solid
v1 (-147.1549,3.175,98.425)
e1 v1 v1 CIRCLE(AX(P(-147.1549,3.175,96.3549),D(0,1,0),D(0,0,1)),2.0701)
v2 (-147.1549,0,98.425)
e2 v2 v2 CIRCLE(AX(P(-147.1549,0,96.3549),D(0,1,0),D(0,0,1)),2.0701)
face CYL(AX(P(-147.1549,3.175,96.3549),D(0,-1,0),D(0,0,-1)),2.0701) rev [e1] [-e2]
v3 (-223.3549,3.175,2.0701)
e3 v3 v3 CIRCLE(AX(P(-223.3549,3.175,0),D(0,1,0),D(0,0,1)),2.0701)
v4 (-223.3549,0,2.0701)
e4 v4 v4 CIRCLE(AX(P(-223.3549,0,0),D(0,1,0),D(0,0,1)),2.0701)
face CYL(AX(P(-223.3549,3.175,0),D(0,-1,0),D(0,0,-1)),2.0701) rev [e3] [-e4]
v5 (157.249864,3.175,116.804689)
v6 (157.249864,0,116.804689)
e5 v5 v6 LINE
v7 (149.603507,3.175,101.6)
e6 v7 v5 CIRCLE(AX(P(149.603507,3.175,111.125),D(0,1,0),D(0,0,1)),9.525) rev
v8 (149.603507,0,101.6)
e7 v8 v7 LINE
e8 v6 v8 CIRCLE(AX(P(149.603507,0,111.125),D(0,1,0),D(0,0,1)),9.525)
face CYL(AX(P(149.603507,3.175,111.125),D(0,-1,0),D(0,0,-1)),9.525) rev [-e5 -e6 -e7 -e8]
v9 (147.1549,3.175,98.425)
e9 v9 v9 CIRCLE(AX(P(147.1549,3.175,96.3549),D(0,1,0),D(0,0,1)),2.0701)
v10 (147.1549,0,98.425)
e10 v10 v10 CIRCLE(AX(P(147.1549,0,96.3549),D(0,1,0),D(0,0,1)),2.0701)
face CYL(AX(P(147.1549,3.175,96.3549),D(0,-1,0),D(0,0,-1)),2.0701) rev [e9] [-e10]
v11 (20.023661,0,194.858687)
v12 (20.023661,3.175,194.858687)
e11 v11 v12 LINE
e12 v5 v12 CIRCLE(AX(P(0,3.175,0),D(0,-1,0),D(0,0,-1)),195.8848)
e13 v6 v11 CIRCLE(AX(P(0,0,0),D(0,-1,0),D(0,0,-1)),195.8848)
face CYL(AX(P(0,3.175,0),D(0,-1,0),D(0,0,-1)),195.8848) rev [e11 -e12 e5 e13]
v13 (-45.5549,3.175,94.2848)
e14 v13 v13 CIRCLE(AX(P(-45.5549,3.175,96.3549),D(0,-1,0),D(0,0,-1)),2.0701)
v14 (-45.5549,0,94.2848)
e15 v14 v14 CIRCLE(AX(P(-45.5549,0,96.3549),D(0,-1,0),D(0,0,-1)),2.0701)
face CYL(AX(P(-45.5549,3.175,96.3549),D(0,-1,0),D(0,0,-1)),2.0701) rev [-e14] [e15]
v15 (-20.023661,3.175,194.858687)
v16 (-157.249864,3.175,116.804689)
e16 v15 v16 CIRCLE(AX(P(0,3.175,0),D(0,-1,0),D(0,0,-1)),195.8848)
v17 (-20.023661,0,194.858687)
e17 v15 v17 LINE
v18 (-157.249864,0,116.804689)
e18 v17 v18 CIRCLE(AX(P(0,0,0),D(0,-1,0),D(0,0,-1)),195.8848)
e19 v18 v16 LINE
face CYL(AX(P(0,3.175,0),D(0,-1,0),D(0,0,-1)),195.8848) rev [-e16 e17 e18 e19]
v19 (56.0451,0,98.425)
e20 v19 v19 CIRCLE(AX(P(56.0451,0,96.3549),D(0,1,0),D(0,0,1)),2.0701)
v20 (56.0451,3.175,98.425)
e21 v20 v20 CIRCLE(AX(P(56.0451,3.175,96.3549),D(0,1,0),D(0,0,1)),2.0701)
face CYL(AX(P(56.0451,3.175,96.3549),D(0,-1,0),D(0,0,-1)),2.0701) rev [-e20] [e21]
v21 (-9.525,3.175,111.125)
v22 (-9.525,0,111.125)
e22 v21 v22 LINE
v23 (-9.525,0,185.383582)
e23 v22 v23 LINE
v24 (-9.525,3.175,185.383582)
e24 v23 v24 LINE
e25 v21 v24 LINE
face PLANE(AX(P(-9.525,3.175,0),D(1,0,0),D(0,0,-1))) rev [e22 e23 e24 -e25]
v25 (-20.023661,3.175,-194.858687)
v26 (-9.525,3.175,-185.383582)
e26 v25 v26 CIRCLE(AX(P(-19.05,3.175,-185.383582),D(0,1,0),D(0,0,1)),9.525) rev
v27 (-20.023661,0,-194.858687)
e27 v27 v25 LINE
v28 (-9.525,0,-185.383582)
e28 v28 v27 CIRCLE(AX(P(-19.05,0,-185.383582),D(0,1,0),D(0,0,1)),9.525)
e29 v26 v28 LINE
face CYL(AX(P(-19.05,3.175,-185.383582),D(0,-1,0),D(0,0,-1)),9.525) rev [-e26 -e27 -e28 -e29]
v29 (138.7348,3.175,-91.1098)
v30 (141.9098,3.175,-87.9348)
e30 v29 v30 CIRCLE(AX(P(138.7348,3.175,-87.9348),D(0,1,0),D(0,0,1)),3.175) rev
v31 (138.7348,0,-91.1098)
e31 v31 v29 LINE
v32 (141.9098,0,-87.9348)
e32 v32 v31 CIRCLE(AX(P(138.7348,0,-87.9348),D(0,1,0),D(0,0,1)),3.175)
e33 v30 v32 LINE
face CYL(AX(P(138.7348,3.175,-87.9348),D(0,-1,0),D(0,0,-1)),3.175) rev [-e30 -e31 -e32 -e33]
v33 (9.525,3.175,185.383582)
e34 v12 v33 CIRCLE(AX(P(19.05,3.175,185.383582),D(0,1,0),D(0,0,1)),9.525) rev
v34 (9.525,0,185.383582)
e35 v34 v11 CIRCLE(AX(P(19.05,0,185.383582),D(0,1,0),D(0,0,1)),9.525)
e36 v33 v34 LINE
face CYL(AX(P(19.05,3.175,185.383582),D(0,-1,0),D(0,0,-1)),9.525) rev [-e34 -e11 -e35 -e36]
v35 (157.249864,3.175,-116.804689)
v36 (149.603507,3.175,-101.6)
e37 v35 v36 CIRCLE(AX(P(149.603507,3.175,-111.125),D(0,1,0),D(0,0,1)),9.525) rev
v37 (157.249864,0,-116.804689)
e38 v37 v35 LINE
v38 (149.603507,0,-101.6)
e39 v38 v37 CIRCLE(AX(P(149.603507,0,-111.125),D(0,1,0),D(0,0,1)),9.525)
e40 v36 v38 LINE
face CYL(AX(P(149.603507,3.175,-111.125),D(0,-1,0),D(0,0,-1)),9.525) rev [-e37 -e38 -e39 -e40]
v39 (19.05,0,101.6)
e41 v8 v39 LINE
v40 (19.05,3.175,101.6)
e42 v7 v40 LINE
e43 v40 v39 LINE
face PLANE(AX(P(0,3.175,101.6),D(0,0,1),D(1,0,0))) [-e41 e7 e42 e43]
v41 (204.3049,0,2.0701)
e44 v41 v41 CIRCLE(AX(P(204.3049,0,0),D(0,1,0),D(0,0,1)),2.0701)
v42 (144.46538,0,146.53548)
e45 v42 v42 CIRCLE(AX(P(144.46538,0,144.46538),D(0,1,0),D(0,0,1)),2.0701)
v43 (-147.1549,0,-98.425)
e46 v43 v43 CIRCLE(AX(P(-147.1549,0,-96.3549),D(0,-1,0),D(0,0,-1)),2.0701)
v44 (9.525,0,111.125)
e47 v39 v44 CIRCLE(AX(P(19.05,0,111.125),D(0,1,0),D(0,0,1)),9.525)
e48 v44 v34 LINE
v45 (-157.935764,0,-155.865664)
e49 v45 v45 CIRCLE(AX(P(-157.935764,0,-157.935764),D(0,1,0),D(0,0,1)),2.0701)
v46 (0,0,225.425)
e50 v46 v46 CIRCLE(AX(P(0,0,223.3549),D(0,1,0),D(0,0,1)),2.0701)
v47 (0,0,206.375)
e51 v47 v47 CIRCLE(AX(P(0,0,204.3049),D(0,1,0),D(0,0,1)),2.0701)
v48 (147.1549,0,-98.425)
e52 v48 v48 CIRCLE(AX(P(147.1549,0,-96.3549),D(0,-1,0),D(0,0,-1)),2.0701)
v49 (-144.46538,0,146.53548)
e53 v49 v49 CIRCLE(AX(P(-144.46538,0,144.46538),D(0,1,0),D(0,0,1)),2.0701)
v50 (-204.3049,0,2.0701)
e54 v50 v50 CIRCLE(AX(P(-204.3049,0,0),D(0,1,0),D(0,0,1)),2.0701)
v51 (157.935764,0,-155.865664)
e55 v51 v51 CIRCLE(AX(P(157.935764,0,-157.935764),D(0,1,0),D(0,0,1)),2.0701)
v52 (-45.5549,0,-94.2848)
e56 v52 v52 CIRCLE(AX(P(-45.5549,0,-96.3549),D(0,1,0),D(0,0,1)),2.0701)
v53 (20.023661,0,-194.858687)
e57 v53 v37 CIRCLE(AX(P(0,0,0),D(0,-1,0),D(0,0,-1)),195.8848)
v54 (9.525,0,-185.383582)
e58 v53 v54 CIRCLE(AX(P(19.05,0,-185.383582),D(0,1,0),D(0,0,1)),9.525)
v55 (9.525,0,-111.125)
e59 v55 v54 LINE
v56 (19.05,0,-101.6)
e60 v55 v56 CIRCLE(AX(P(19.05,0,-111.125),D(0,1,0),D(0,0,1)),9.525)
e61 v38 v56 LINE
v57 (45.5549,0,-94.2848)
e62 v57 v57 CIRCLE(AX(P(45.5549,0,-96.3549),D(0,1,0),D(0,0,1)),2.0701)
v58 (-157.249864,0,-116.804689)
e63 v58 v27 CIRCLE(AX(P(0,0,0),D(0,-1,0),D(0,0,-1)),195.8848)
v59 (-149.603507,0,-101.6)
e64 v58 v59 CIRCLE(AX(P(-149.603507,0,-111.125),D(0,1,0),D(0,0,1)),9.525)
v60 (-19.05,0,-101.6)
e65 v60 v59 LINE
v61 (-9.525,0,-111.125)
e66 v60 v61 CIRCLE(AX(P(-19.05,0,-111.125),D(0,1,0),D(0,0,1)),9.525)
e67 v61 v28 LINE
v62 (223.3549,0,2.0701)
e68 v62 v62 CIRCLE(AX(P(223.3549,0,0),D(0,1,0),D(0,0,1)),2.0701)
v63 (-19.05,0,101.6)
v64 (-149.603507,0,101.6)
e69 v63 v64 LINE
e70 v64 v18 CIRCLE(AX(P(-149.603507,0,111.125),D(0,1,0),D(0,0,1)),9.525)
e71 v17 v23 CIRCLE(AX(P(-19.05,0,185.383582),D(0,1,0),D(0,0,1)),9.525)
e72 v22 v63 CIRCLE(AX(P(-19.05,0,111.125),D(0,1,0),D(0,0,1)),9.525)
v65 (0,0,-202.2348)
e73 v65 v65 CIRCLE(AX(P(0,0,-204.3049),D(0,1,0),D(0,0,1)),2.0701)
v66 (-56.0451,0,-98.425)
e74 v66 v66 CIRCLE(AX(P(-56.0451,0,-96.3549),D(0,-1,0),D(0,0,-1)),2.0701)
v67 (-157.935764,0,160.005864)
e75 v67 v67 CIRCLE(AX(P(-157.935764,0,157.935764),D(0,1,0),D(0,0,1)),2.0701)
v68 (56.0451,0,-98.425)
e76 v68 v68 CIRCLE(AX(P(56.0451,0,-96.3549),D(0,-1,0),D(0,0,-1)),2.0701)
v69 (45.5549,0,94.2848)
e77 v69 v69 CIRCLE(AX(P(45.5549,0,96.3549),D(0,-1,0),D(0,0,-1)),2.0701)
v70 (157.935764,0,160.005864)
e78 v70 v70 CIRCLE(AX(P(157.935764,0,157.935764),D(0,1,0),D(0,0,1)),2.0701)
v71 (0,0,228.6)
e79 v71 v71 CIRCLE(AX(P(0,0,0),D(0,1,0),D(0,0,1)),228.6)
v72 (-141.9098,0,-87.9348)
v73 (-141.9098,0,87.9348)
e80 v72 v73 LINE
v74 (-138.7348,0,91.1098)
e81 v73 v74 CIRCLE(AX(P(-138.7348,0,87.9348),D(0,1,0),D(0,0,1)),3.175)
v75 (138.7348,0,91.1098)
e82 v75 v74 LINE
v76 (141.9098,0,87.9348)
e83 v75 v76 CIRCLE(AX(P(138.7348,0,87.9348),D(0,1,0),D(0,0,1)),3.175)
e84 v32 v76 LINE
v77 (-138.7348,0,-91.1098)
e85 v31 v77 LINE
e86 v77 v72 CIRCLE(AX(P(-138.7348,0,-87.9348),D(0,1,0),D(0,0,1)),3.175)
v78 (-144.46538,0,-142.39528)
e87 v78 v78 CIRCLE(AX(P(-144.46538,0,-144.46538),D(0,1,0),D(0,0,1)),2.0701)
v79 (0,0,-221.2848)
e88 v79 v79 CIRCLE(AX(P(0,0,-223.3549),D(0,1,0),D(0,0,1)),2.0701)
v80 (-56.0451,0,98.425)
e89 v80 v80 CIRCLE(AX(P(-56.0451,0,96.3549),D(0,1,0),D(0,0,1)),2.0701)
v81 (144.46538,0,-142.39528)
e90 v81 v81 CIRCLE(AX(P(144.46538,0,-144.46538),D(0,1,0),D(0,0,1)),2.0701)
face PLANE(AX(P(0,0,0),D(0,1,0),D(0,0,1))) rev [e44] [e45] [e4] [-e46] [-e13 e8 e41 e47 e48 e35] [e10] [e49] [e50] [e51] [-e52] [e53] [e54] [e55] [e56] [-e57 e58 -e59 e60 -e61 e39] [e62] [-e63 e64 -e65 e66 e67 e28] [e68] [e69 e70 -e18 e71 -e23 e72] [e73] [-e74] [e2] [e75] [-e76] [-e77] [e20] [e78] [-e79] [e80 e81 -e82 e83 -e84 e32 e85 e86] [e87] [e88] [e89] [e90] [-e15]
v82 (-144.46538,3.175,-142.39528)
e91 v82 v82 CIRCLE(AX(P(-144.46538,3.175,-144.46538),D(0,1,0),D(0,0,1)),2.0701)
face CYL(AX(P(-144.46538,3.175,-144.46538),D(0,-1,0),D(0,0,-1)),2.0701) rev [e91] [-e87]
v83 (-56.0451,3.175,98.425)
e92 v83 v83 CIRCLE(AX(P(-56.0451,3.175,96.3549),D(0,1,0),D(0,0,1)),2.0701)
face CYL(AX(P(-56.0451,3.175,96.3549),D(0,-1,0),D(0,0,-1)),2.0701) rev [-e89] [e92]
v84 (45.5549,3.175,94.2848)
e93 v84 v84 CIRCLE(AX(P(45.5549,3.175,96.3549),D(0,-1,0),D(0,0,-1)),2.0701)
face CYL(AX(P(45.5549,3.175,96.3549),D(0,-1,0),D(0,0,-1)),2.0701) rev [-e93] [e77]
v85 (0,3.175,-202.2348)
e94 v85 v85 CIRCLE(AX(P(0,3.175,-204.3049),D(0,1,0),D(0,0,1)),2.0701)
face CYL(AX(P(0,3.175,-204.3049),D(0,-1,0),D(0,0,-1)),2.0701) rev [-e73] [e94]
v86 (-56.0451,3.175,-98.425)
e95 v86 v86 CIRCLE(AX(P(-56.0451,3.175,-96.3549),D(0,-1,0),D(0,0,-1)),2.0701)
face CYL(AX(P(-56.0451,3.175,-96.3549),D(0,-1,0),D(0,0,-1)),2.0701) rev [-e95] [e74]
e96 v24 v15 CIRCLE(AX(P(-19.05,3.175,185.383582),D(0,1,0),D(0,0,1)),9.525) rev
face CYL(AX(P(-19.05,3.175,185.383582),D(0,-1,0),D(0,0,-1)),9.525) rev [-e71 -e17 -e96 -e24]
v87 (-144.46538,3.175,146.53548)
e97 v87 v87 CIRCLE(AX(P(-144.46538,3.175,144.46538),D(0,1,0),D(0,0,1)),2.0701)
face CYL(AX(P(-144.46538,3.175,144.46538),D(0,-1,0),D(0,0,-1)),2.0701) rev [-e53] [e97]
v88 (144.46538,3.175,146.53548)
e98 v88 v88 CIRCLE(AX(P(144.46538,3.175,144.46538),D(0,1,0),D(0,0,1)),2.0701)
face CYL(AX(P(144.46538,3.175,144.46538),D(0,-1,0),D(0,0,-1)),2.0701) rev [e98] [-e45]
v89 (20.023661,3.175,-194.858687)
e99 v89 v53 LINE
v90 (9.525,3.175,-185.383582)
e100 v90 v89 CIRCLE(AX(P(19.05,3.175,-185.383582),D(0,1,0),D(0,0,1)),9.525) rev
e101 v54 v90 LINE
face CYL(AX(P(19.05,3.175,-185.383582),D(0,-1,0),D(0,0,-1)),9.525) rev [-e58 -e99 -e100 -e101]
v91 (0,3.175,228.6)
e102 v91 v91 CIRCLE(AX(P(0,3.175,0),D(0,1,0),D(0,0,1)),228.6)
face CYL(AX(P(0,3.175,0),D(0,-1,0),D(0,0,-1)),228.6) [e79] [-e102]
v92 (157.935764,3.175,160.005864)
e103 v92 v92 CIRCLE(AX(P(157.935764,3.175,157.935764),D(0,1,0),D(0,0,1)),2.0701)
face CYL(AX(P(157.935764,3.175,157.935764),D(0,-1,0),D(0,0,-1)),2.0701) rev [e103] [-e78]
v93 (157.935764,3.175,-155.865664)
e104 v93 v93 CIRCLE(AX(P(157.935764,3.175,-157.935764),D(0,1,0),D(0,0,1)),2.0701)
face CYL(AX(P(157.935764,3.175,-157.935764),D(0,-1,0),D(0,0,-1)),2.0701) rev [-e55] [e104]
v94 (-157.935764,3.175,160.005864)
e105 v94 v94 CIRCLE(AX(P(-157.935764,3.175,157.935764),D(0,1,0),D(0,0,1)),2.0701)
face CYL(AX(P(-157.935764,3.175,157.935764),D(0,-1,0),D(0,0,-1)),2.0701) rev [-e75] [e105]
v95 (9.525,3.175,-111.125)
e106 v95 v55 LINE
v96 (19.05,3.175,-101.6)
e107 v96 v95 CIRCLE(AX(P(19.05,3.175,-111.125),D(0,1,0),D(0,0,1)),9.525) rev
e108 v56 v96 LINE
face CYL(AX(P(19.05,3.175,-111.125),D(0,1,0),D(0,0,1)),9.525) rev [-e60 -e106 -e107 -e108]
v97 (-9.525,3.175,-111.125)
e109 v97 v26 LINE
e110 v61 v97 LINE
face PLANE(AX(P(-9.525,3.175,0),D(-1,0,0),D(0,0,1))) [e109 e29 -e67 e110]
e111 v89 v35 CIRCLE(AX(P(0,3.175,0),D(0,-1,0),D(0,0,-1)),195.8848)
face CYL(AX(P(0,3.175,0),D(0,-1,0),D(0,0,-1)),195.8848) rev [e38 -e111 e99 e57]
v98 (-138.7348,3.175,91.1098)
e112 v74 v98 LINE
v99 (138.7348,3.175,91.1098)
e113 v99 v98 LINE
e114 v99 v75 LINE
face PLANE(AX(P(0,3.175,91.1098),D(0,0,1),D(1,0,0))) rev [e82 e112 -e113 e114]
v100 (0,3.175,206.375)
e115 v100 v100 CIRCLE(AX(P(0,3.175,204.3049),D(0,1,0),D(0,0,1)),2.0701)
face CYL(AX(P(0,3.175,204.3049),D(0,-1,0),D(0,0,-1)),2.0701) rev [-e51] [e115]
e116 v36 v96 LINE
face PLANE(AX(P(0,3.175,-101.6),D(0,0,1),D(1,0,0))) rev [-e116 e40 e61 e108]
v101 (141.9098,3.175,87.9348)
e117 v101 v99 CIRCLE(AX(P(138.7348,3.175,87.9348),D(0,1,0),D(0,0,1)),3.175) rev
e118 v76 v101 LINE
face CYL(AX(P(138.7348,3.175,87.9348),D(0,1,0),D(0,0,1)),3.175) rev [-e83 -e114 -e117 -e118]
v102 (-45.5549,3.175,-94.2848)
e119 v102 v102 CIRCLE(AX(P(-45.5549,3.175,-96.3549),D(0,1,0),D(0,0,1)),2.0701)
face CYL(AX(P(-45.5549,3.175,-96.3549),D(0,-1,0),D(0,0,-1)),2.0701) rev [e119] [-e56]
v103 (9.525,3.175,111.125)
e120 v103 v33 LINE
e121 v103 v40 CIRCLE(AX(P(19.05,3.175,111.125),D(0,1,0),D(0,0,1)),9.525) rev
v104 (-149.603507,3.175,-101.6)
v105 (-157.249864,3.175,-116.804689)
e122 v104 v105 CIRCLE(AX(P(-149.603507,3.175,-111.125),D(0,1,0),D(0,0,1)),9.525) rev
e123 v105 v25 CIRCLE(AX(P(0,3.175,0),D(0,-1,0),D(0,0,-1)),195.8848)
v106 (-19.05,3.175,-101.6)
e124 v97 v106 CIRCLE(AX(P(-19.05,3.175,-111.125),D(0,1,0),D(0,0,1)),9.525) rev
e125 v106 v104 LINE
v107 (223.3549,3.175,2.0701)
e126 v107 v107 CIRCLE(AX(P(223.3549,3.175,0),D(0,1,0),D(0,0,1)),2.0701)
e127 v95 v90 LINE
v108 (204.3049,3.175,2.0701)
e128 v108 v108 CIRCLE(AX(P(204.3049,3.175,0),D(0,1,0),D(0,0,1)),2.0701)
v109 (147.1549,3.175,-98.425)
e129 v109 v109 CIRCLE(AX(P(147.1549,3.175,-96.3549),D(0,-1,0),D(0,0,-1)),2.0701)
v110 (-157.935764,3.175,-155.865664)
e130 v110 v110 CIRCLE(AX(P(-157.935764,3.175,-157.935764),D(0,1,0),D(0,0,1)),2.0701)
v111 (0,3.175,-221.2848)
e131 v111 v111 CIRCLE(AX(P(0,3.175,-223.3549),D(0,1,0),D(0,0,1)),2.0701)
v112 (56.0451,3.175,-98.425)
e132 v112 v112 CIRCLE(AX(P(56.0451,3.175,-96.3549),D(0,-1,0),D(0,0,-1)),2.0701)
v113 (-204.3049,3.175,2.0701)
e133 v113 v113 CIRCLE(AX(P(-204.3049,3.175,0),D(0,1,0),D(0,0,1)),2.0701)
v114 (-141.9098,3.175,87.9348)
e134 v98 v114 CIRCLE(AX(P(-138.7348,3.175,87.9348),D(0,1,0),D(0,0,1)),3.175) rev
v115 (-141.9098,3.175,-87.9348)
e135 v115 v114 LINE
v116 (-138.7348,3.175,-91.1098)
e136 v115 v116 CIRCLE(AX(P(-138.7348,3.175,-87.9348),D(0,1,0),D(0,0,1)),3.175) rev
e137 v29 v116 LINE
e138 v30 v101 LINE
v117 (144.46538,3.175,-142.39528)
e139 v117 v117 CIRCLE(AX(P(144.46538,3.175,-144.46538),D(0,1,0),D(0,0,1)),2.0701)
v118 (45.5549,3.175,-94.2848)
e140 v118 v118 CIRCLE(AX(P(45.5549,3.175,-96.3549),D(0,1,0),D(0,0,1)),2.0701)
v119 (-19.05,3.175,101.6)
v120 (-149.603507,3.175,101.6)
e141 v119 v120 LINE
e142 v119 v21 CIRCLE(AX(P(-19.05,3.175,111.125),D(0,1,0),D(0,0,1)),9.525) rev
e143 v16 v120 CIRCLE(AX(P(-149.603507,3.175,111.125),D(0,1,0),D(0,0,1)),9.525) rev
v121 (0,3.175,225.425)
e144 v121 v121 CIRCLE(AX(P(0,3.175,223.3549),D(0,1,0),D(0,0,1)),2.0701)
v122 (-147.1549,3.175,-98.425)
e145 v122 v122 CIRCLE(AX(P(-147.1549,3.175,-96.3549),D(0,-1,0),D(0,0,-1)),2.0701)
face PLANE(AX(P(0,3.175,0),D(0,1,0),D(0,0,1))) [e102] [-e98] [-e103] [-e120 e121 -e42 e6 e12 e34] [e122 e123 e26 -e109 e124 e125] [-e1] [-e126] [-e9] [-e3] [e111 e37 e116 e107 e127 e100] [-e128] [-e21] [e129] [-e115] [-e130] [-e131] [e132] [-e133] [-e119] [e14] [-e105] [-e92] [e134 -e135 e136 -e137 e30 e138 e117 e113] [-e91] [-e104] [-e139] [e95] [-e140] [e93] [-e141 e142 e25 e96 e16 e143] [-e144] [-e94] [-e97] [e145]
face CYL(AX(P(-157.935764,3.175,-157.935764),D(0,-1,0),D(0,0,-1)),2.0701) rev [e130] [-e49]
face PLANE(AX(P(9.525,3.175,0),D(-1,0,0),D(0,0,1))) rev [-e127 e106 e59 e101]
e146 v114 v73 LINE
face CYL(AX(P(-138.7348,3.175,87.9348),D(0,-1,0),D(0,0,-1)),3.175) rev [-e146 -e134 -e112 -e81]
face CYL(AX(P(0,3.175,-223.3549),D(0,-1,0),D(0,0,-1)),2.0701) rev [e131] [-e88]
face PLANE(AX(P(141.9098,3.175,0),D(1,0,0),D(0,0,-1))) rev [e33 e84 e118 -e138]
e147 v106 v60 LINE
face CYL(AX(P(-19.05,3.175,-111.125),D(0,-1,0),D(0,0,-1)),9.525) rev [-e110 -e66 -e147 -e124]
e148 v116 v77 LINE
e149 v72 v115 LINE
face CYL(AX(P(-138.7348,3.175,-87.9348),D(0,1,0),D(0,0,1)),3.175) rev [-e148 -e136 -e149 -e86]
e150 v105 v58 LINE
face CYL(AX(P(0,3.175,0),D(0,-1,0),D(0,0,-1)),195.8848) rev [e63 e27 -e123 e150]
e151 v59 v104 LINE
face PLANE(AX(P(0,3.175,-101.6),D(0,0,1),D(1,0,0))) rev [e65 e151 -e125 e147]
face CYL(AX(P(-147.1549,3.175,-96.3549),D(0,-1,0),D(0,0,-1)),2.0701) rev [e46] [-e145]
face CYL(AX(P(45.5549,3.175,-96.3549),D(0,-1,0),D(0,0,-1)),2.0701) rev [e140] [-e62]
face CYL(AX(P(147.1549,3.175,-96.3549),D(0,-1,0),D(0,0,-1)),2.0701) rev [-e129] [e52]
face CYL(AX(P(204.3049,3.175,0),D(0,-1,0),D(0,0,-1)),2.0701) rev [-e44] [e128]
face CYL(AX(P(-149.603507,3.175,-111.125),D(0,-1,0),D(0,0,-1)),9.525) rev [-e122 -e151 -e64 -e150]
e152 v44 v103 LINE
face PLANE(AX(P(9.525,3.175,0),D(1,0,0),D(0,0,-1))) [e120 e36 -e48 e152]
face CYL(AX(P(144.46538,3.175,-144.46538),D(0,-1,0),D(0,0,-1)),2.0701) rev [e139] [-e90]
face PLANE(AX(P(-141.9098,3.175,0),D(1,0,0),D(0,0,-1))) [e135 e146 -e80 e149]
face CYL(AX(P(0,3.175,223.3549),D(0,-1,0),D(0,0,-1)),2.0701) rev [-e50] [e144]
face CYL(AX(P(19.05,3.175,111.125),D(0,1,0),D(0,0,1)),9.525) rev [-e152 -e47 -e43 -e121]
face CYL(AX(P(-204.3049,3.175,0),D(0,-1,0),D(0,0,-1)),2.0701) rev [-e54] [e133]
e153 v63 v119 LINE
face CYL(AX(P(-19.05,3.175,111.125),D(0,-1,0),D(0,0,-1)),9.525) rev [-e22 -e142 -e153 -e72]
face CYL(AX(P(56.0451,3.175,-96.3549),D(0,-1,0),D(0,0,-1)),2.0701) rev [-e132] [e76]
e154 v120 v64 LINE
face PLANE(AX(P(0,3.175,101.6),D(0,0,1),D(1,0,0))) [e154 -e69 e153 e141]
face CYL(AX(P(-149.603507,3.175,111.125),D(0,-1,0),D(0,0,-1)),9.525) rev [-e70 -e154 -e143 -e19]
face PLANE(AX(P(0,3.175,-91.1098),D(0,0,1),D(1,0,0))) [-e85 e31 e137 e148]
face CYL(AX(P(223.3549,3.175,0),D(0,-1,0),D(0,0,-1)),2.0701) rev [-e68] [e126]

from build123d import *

# Parameters (mm, degrees)
BOSS_EXTRUDE1_OUTLINE_R   = 228.6
BOSS_EXTRUDE1_OUTLINE_R_2 = 2.0701
BOSS_EXTRUDE1_DEPTH       = 3.175
SKETCH3_W                 = 283.8196
SKETCH3_H                 = 182.2196
SKETCH3_R                 = 2.0701
CUT_EXTRUDE1_DEPTH        = 324.304810705
FILLET1_R                 = 3.175
CUT_EXTRUDE2_DEPTH        = 324.304810705
FILLET2_R                 = 9.525


# Read off the part's stored shape, not the designer's step: Boss-Extrude1
with BuildPart() as part:
    # Boss-Extrude1 outline → Boss-Extrude1 (new body)
    with BuildSketch(Plane(origin=(0, 0, 0), x_dir=(1, 0, 0), z_dir=(0, 1, 0))):
        Circle(BOSS_EXTRUDE1_OUTLINE_R)
        with Locations((-157.935764401, -157.935764401)):
            Circle(BOSS_EXTRUDE1_OUTLINE_R_2, mode=Mode.SUBTRACT)
        with Locations((-144.46538022, -144.46538022)):
            Circle(BOSS_EXTRUDE1_OUTLINE_R_2, mode=Mode.SUBTRACT)
        with Locations((0, -223.3549)):
            Circle(BOSS_EXTRUDE1_OUTLINE_R_2, mode=Mode.SUBTRACT)
        with Locations((0, -204.3049)):
            Circle(BOSS_EXTRUDE1_OUTLINE_R_2, mode=Mode.SUBTRACT)
        with Locations((157.935764401, -157.935764401)):
            Circle(BOSS_EXTRUDE1_OUTLINE_R_2, mode=Mode.SUBTRACT)
        with Locations((144.46538022, -144.46538022)):
            Circle(BOSS_EXTRUDE1_OUTLINE_R_2, mode=Mode.SUBTRACT)
        with Locations((-223.3549, 0)):
            Circle(BOSS_EXTRUDE1_OUTLINE_R_2, mode=Mode.SUBTRACT)
        with Locations((-204.3049, 0)):
            Circle(BOSS_EXTRUDE1_OUTLINE_R_2, mode=Mode.SUBTRACT)
        with Locations((-144.46538022, 144.46538022)):
            Circle(BOSS_EXTRUDE1_OUTLINE_R_2, mode=Mode.SUBTRACT)
        with Locations((-157.935764401, 157.935764401)):
            Circle(BOSS_EXTRUDE1_OUTLINE_R_2, mode=Mode.SUBTRACT)
        with Locations((204.3049, 0)):
            Circle(BOSS_EXTRUDE1_OUTLINE_R_2, mode=Mode.SUBTRACT)
        with Locations((223.3549, 0)):
            Circle(BOSS_EXTRUDE1_OUTLINE_R_2, mode=Mode.SUBTRACT)
        with Locations((0, 204.3049)):
            Circle(BOSS_EXTRUDE1_OUTLINE_R_2, mode=Mode.SUBTRACT)
        with Locations((0, 223.3549)):
            Circle(BOSS_EXTRUDE1_OUTLINE_R_2, mode=Mode.SUBTRACT)
        with Locations((144.46538022, 144.46538022)):
            Circle(BOSS_EXTRUDE1_OUTLINE_R_2, mode=Mode.SUBTRACT)
        with Locations((157.935764401, 157.935764401)):
            Circle(BOSS_EXTRUDE1_OUTLINE_R_2, mode=Mode.SUBTRACT)
    extrude(amount=BOSS_EXTRUDE1_DEPTH)

    # Sketch3 → Cut-Extrude1 (cut, through all)
    with BuildSketch(Plane.XZ):
        Rectangle(SKETCH3_W, SKETCH3_H)
        with Locations(Location((147.1549, -96.3549, 0), (0, 0, 270))):
            Circle(SKETCH3_R)
        with Locations(Location((56.0451, -96.3549, 0), (0, 0, 270))):
            Circle(SKETCH3_R)
        with Locations(Location((45.5549, -96.3549, 0), (0, 0, 90))):
            Circle(SKETCH3_R)
        with Locations(Location((-45.5549, -96.3549, 0), (0, 0, 90))):
            Circle(SKETCH3_R)
        with Locations(Location((-56.0451, -96.3549, 0), (0, 0, 270))):
            Circle(SKETCH3_R)
        with Locations(Location((-147.1549, -96.3549, 0), (0, 0, 270))):
            Circle(SKETCH3_R)
        with Locations(Location((-147.1549, 96.3549, 0), (0, 0, 90))):
            Circle(SKETCH3_R)
        with Locations(Location((-56.0451, 96.3549, 0), (0, 0, 90))):
            Circle(SKETCH3_R)
        with Locations(Location((-45.5549, 96.3549, 0), (0, 0, 270))):
            Circle(SKETCH3_R)
        with Locations(Location((45.5549, 96.3549, 0), (0, 0, 270))):
            Circle(SKETCH3_R)
        with Locations(Location((56.0451, 96.3549, 0), (0, 0, 90))):
            Circle(SKETCH3_R)
        with Locations(Location((147.1549, 96.3549, 0), (0, 0, 90))):
            Circle(SKETCH3_R)
    extrude(amount=-CUT_EXTRUDE1_DEPTH, mode=Mode.SUBTRACT)

    # Fillet1
    fillet1_edges = [part.edges().sort_by_distance(p)[0] for p in [
        (-141.9098, 1.5875, -91.1098),
        (-141.9098, 1.5875, 91.1098),
        (141.9098, 1.5875, 91.1098),
        (141.9098, 1.5875, -91.1098),
    ]]
    fillet(fillet1_edges, radius=FILLET1_R)

    # Sketch4 → Cut-Extrude2 (cut, through all)
    with BuildSketch(Plane.XZ):
        with BuildLine():
            Line((-9.525, -195.653083917), (-9.525, -101.6))
            Line((-9.525, -101.6), (-167.476251663, -101.6))
            ThreePointArc((-167.476251663, -101.6), (-100.219042208, -168.306263846), (-9.525, -195.653083917))
        make_face()
        with BuildLine():
            Line((167.476251663, -101.6), (9.525, -101.6))
            Line((9.525, -101.6), (9.525, -195.653083917))
            ThreePointArc((9.525, -195.653083917), (100.219042208, -168.306263846), (167.476251663, -101.6))
        make_face()
        with BuildLine():
            Line((9.525, 101.6), (167.476251663, 101.6))
            ThreePointArc((167.476251663, 101.6), (100.219042208, 168.306263846), (9.525, 195.653083917))
            Line((9.525, 195.653083917), (9.525, 101.6))
        make_face()
        with BuildLine():
            ThreePointArc((-9.525, 195.653083917), (-100.219042208, 168.306263846), (-167.476251663, 101.6))
            Line((-167.476251663, 101.6), (-9.525, 101.6))
            Line((-9.525, 101.6), (-9.525, 195.653083917))
        make_face()
    extrude(amount=-CUT_EXTRUDE2_DEPTH, mode=Mode.SUBTRACT)

    # Fillet2
    fillet2_edges = [part.edges().sort_by_distance(p)[0] for p in [
        (-167.476251663, 1.5875, -101.6),
        (-9.525, 1.5875, -101.6),
        (-9.525, 1.5875, -195.653083917),
        (9.525, 1.5875, -195.653083917),
        (9.525, 1.5875, -101.6),
        (167.476251663, 1.5875, -101.6),
        (167.476251663, 1.5875, 101.6),
        (9.525, 1.5875, 101.6),
        (9.525, 1.5875, 195.653083917),
        (-9.525, 1.5875, 195.653083917),
        (-9.525, 1.5875, 101.6),
        (-167.476251663, 1.5875, 101.6),
    ]]
    fillet(fillet2_edges, radius=FILLET2_R)


solid = part.part
